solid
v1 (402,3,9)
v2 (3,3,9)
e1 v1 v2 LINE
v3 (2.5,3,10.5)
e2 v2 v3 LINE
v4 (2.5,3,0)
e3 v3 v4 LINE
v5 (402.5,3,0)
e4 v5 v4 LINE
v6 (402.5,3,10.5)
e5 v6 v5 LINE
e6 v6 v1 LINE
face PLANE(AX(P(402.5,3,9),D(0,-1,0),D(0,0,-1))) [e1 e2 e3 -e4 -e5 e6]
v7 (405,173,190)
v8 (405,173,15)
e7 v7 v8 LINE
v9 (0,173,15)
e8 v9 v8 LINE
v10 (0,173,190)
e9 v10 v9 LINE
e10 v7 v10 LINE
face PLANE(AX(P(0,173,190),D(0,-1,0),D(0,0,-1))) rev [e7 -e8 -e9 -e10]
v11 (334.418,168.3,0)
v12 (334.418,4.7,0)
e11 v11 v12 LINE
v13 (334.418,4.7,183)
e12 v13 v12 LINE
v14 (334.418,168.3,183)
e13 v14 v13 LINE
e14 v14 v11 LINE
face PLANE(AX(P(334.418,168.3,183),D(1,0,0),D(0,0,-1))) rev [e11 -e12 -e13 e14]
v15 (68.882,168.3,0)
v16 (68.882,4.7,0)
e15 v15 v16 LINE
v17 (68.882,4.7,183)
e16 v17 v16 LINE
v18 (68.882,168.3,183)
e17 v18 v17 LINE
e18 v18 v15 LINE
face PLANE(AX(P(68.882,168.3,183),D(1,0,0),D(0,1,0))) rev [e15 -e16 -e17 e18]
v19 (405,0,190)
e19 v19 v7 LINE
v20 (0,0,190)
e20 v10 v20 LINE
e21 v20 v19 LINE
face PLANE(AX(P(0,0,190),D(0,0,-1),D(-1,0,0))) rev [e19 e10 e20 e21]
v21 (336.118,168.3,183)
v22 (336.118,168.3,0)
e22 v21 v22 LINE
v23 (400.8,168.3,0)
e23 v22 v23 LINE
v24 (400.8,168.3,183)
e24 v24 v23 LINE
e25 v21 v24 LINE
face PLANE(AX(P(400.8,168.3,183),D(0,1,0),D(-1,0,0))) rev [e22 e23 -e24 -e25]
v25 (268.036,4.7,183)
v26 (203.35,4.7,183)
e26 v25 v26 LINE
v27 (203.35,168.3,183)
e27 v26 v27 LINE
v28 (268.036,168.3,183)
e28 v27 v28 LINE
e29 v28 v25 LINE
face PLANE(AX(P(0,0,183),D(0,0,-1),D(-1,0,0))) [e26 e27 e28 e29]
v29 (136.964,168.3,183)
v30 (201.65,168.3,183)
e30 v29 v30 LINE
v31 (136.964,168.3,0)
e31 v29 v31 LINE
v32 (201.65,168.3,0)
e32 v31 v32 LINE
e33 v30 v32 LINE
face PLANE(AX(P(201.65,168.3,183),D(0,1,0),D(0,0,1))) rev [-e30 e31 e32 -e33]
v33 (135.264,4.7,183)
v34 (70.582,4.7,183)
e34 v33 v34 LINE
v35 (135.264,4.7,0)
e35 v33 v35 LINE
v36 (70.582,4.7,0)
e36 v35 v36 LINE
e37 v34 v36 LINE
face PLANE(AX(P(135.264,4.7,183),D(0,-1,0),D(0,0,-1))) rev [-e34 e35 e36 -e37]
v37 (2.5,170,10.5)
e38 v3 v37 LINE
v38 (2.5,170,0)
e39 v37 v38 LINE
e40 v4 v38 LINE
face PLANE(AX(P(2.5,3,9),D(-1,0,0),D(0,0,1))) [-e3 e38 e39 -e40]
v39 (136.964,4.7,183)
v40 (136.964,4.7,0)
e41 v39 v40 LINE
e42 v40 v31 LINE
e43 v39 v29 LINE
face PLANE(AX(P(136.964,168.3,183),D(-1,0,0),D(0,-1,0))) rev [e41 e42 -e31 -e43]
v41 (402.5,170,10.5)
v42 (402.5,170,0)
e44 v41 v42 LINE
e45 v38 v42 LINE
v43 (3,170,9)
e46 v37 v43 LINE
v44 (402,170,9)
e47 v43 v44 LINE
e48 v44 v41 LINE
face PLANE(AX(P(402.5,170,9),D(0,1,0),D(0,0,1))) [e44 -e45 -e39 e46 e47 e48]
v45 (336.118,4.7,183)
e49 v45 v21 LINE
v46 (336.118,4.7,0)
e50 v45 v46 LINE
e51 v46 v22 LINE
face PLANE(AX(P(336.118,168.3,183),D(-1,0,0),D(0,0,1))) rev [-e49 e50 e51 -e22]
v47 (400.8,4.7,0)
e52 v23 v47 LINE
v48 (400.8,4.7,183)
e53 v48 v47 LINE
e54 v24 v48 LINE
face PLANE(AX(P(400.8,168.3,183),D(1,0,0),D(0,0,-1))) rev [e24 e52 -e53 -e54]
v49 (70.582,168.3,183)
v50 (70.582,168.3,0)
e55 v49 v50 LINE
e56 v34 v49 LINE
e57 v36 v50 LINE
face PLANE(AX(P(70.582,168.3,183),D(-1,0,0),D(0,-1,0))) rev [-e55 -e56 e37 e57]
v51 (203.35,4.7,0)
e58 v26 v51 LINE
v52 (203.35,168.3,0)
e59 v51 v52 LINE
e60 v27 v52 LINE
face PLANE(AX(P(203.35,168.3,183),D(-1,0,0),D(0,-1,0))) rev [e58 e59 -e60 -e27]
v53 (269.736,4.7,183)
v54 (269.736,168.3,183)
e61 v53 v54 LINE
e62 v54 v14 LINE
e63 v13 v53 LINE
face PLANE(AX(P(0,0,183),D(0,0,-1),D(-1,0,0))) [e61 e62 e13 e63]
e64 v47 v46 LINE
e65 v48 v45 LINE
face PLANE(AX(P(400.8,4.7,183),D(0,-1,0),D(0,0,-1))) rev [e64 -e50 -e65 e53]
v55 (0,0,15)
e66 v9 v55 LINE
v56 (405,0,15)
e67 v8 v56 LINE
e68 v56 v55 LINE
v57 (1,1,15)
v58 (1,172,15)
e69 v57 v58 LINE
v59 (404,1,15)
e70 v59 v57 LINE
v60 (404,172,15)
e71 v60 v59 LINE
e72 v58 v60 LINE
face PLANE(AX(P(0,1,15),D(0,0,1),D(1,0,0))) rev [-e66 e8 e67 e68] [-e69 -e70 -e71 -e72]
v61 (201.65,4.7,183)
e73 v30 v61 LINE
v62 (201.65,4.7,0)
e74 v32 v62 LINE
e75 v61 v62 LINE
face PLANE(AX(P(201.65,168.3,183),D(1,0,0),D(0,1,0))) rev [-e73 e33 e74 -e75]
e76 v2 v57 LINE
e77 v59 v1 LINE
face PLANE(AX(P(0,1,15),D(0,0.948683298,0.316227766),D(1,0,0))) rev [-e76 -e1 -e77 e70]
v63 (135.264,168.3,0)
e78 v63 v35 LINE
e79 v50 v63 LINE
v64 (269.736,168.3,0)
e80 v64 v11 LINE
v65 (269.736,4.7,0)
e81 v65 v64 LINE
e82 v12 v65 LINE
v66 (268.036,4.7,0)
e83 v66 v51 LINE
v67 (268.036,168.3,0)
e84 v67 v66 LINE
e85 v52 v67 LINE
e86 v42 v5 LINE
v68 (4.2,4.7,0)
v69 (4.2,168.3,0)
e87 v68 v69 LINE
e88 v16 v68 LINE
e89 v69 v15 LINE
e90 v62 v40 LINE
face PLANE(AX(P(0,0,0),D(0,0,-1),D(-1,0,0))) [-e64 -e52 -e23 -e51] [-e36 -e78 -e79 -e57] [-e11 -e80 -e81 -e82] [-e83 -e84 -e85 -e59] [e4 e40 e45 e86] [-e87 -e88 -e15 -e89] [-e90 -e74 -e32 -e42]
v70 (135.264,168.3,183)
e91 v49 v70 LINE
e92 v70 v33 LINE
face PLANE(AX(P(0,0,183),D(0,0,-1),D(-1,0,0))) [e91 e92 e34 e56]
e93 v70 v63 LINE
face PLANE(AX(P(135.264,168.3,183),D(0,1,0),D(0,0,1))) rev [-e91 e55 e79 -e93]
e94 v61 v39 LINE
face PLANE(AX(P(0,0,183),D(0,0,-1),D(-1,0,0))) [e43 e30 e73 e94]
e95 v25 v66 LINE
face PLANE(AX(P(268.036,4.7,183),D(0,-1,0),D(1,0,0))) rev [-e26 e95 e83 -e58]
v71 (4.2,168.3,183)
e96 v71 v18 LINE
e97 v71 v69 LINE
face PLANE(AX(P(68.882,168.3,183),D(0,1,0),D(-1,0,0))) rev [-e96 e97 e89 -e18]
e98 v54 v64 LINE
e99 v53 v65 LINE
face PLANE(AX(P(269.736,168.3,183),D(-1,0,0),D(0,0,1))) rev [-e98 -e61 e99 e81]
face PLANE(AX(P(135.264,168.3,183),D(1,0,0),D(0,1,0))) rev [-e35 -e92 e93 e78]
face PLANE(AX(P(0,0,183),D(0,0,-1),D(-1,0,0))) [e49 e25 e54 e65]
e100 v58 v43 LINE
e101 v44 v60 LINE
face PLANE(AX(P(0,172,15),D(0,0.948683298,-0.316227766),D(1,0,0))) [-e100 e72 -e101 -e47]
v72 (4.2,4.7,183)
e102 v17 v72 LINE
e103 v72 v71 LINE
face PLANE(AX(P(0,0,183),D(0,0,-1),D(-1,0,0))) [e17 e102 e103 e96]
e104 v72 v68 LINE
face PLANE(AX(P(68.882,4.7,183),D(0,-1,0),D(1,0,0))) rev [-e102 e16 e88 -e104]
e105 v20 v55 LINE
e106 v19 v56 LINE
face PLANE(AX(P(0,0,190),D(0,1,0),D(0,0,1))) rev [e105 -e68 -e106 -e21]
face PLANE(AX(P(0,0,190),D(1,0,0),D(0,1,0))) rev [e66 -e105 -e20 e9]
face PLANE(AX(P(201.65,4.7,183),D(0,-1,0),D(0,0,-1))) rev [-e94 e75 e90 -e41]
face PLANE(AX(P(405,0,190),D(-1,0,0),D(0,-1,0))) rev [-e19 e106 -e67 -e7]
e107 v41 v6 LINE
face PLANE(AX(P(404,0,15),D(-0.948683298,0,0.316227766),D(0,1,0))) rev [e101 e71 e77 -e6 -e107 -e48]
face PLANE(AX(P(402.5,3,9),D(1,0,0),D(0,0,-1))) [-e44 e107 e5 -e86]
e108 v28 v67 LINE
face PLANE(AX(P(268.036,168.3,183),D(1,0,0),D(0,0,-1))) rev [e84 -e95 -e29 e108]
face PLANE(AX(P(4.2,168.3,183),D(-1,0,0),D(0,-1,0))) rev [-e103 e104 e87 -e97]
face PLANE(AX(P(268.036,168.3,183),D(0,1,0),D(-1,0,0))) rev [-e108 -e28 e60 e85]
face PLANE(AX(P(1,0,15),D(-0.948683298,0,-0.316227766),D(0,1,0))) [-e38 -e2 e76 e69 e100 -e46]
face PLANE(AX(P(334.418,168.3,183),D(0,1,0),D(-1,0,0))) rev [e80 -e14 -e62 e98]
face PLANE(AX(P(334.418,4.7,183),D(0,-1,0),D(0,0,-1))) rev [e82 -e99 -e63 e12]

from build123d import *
from OCP.BRepFilletAPI import BRepFilletAPI_MakeChamfer

# Parameters (mm, degrees)
SKETCH_1_W          = 405
SKETCH_1_H          = 173
EXTRUDE_1_DEPTH     = 190
SKETCH_2_W          = 405
SKETCH_2_H          = 173
SKETCH_2_W_2        = 400
SKETCH_2_H_2        = 167
CUT_EXTRUDE_1_DEPTH = 9
SKETCH_3_W          = 405
SKETCH_3_H          = 6
CUT_EXTRUDE_2_DEPTH = 1
SKETCH_4_W          = 6
SKETCH_4_H          = 173
CUT_EXTRUDE_3_DEPTH = 1
SKETCH_5_W          = 404
SKETCH_5_H          = 6
CUT_EXTRUDE_4_DEPTH = 1
SKETCH_6_W          = 6
SKETCH_6_H          = 171
CUT_EXTRUDE_5_DEPTH = 1
CHAMFER_1_SIZE      = 6
CHAMFER_1_SIZE_2    = 2
CHAMFER_2_SIZE      = 2
CHAMFER_2_SIZE_2    = 6
SKETCH_7_W          = 64.686
SKETCH_7_H          = 163.6
SKETCH_7_W_2        = 64.682
CUT_EXTRUDE_6_DEPTH = 183


# Some blends are built 0.0001 mm under size
with BuildPart() as part:
    # 草图1 → 凸台-拉伸1 (new body)
    with BuildSketch(Plane.XY):
        with Locations((202.5, 86.5)):
            Rectangle(SKETCH_1_W, SKETCH_1_H)
    extrude(amount=EXTRUDE_1_DEPTH)

    # 草图2 → 切除-拉伸1 (cut)
    with BuildSketch(Plane(origin=(0, 0, 0), x_dir=(-1, 0, 0), z_dir=(0, 0, -1))):
        with Locations((-202.5, 86.5)):
            Rectangle(SKETCH_2_W, SKETCH_2_H)
        with Locations((-202.5, 86.5)):
            Rectangle(SKETCH_2_W_2, SKETCH_2_H_2, mode=Mode.SUBTRACT)
    extrude(amount=-CUT_EXTRUDE_1_DEPTH, mode=Mode.SUBTRACT)

    # 草图3 → 切除-拉伸2 (cut)
    with BuildSketch(Plane.XZ):
        with Locations((202.5, 12)):
            Rectangle(SKETCH_3_W, SKETCH_3_H)
    extrude(amount=-CUT_EXTRUDE_2_DEPTH, mode=Mode.SUBTRACT)

    # 草图4 → 切除-拉伸3 (cut)
    with BuildSketch(Plane(origin=(405, 0, 0), x_dir=(0, 0, -1), z_dir=(1, 0, 0))):
        with Locations((-12, 86.5)):
            Rectangle(SKETCH_4_W, SKETCH_4_H)
    extrude(amount=-CUT_EXTRUDE_3_DEPTH, mode=Mode.SUBTRACT)

    # 草图5 → 切除-拉伸4 (cut)
    with BuildSketch(Plane(origin=(0, 173, 0), x_dir=(1, 0, 0), z_dir=(0, 1, 0))):
        with Locations((202, -12)):
            Rectangle(SKETCH_5_W, SKETCH_5_H)
    extrude(amount=-CUT_EXTRUDE_4_DEPTH, mode=Mode.SUBTRACT)

    # 草图6 → 切除-拉伸5 (cut)
    with BuildSketch(Plane.ZY):
        with Locations((12, 86.5)):
            Rectangle(SKETCH_6_W, SKETCH_6_H)
    extrude(amount=-CUT_EXTRUDE_5_DEPTH, mode=Mode.SUBTRACT)

    # 倒角1
    # the kernel refuses this chamfer: 6, 2 mm, written as the material it takes off along each edge
    with BuildSketch(Plane(origin=(1, -14.570366064, 9), x_dir=(-0.012185754582199162, 0, 0.9999257509361694), z_dir=(0, 1, 0))) as chamfer_1_piece_1_section:
        Polygon((CHAMFER_1_SIZE * 0.999925750936, CHAMFER_1_SIZE * 0.0121857545822), (-CHAMFER_1_SIZE_2 * 0.0121857545822, CHAMFER_1_SIZE_2 * 0.999925750936), (0, 0), align=None)
    chamfer_1_piece_1 = extrude(amount=202.140732128, mode=Mode.PRIVATE)
    chamfer_1_piece_1 = split(chamfer_1_piece_1, bisect_by=Plane(origin=(2.5, 2, 11.1), z_dir=(-1, 0, 0)), keep=Keep.TOP, mode=Mode.PRIVATE)
    add(chamfer_1_piece_1, mode=Mode.SUBTRACT)
    with BuildSketch(Plane(origin=(1, -14.570366064, 9), x_dir=(-0.012185754582199162, 0, 0.9999257509361694), z_dir=(0, 1, 0))) as chamfer_1_piece_2_section:
        Polygon((CHAMFER_1_SIZE * 0.999925750936, CHAMFER_1_SIZE * 0.0121857545822), (-CHAMFER_1_SIZE_2 * 0.0121857545822, CHAMFER_1_SIZE_2 * 0.999925750936), (0, 0), align=None)
    chamfer_1_piece_2 = extrude(amount=202.140732128, mode=Mode.PRIVATE)
    chamfer_1_piece_2 = split(chamfer_1_piece_2, bisect_by=Plane(origin=(2.666666667, 3, 9.5), z_dir=(0, -1, 0)), keep=Keep.TOP, mode=Mode.PRIVATE)
    add(chamfer_1_piece_2, mode=Mode.SUBTRACT)
    with BuildSketch(Plane(origin=(1, -14.570366064, 9), x_dir=(-0.012185754582199162, 0, 0.9999257509361694), z_dir=(0, 1, 0))) as chamfer_1_piece_3_section:
        Polygon((CHAMFER_1_SIZE * 0.999925750936, CHAMFER_1_SIZE * 0.0121857545822), (-CHAMFER_1_SIZE_2 * 0.0121857545822, CHAMFER_1_SIZE_2 * 0.999925750936), (0, 0), align=None)
    chamfer_1_piece_3 = extrude(amount=202.140732128, mode=Mode.PRIVATE)
    chamfer_1_piece_3 = split(chamfer_1_piece_3, bisect_by=Plane(origin=(2.666666667, 170, 9.5), z_dir=(0, 1, 0)), keep=Keep.TOP, mode=Mode.PRIVATE)
    add(chamfer_1_piece_3, mode=Mode.SUBTRACT)
    with BuildSketch(Plane(origin=(404, -14.570366064, 9), x_dir=(-0.9940388851139268, 0, -0.10902612017980623), z_dir=(0, 1, 0))) as chamfer_1_piece_4_section:
        Polygon((CHAMFER_1_SIZE_2 * 0.994038885114, CHAMFER_1_SIZE_2 * 0.10902612018), (-CHAMFER_1_SIZE * 0.10902612018, CHAMFER_1_SIZE * 0.994038885114), (0, 0), align=None)
    chamfer_1_piece_4 = extrude(amount=202.140732128, mode=Mode.PRIVATE)
    chamfer_1_piece_4 = split(chamfer_1_piece_4, bisect_by=Plane(origin=(402.333333333, 3, 9.5), z_dir=(0, -1, 0)), keep=Keep.TOP, mode=Mode.PRIVATE)
    add(chamfer_1_piece_4, mode=Mode.SUBTRACT)
    with BuildSketch(Plane(origin=(404, -14.570366064, 9), x_dir=(-0.9940388851139268, 0, -0.10902612017980623), z_dir=(0, 1, 0))) as chamfer_1_piece_5_section:
        Polygon((CHAMFER_1_SIZE_2 * 0.994038885114, CHAMFER_1_SIZE_2 * 0.10902612018), (-CHAMFER_1_SIZE * 0.10902612018, CHAMFER_1_SIZE * 0.994038885114), (0, 0), align=None)
    chamfer_1_piece_5 = extrude(amount=202.140732128, mode=Mode.PRIVATE)
    chamfer_1_piece_5 = split(chamfer_1_piece_5, bisect_by=Plane(origin=(402.5, 86.5, 11.1), z_dir=(1, 0, 0)), keep=Keep.TOP, mode=Mode.PRIVATE)
    add(chamfer_1_piece_5, mode=Mode.SUBTRACT)
    with BuildSketch(Plane(origin=(404, -14.570366064, 9), x_dir=(-0.9940388851139268, 0, -0.10902612017980623), z_dir=(0, 1, 0))) as chamfer_1_piece_6_section:
        Polygon((CHAMFER_1_SIZE_2 * 0.994038885114, CHAMFER_1_SIZE_2 * 0.10902612018), (-CHAMFER_1_SIZE * 0.10902612018, CHAMFER_1_SIZE * 0.994038885114), (0, 0), align=None)
    chamfer_1_piece_6 = extrude(amount=202.140732128, mode=Mode.PRIVATE)
    chamfer_1_piece_6 = split(chamfer_1_piece_6, bisect_by=Plane(origin=(402.333333333, 170, 9.5), z_dir=(0, 1, 0)), keep=Keep.TOP, mode=Mode.PRIVATE)
    add(chamfer_1_piece_6, mode=Mode.SUBTRACT)

    # 倒角2
    chamfer_2_edges_1 = [part.edges().sort_by_distance(p)[0] for p in [
        (202.5, 172, 9),
    ]]
    chamfer_2_side_1 = [part.faces().sort_by_distance(p)[0] for p in [
        (202.5, 171.96, 9),
    ]]
    chamfer_2_edges_2 = [part.edges().sort_by_distance(p)[0] for p in [
        (202.5, 1, 9),
    ]]
    chamfer_2_side_2 = [part.faces().sort_by_distance(p)[0] for p in [
        (202.5, 1.04, 9),
    ]]
    chamfer_2 = BRepFilletAPI_MakeChamfer(part.part.solid().wrapped)
    for e in chamfer_2_edges_1:
        chamfer_2.Add(CHAMFER_2_SIZE - 0.0001, CHAMFER_2_SIZE_2 - 0.0001, e.wrapped, chamfer_2_side_1[0].wrapped)
    for e in chamfer_2_edges_2:
        chamfer_2.Add(CHAMFER_2_SIZE - 0.0001, CHAMFER_2_SIZE_2 - 0.0001, e.wrapped, chamfer_2_side_2[0].wrapped)
    add(Compound.cast(chamfer_2.Shape()), mode=Mode.REPLACE)  # a hair under: the kernel refuses the full size

    # 草图7 → 切除-拉伸6 (cut)
    with BuildSketch(Plane(origin=(0, 0, 0), x_dir=(-1, 0, 0), z_dir=(0, 0, -1))):
        with Locations((-235.693, 86.5)):
            Rectangle(SKETCH_7_W, SKETCH_7_H)
        with Locations((-169.307, 86.5)):
            Rectangle(SKETCH_7_W, SKETCH_7_H)
        with Locations((-102.923, 86.5)):
            Rectangle(SKETCH_7_W_2, SKETCH_7_H)
        with Locations((-36.541, 86.5)):
            Rectangle(SKETCH_7_W_2, SKETCH_7_H)
        with Locations((-302.077, 86.5)):
            Rectangle(SKETCH_7_W_2, SKETCH_7_H)
        with Locations((-368.459, 86.5)):
            Rectangle(SKETCH_7_W_2, SKETCH_7_H)
    extrude(amount=-CUT_EXTRUDE_6_DEPTH, mode=Mode.SUBTRACT)


solid = part.part
